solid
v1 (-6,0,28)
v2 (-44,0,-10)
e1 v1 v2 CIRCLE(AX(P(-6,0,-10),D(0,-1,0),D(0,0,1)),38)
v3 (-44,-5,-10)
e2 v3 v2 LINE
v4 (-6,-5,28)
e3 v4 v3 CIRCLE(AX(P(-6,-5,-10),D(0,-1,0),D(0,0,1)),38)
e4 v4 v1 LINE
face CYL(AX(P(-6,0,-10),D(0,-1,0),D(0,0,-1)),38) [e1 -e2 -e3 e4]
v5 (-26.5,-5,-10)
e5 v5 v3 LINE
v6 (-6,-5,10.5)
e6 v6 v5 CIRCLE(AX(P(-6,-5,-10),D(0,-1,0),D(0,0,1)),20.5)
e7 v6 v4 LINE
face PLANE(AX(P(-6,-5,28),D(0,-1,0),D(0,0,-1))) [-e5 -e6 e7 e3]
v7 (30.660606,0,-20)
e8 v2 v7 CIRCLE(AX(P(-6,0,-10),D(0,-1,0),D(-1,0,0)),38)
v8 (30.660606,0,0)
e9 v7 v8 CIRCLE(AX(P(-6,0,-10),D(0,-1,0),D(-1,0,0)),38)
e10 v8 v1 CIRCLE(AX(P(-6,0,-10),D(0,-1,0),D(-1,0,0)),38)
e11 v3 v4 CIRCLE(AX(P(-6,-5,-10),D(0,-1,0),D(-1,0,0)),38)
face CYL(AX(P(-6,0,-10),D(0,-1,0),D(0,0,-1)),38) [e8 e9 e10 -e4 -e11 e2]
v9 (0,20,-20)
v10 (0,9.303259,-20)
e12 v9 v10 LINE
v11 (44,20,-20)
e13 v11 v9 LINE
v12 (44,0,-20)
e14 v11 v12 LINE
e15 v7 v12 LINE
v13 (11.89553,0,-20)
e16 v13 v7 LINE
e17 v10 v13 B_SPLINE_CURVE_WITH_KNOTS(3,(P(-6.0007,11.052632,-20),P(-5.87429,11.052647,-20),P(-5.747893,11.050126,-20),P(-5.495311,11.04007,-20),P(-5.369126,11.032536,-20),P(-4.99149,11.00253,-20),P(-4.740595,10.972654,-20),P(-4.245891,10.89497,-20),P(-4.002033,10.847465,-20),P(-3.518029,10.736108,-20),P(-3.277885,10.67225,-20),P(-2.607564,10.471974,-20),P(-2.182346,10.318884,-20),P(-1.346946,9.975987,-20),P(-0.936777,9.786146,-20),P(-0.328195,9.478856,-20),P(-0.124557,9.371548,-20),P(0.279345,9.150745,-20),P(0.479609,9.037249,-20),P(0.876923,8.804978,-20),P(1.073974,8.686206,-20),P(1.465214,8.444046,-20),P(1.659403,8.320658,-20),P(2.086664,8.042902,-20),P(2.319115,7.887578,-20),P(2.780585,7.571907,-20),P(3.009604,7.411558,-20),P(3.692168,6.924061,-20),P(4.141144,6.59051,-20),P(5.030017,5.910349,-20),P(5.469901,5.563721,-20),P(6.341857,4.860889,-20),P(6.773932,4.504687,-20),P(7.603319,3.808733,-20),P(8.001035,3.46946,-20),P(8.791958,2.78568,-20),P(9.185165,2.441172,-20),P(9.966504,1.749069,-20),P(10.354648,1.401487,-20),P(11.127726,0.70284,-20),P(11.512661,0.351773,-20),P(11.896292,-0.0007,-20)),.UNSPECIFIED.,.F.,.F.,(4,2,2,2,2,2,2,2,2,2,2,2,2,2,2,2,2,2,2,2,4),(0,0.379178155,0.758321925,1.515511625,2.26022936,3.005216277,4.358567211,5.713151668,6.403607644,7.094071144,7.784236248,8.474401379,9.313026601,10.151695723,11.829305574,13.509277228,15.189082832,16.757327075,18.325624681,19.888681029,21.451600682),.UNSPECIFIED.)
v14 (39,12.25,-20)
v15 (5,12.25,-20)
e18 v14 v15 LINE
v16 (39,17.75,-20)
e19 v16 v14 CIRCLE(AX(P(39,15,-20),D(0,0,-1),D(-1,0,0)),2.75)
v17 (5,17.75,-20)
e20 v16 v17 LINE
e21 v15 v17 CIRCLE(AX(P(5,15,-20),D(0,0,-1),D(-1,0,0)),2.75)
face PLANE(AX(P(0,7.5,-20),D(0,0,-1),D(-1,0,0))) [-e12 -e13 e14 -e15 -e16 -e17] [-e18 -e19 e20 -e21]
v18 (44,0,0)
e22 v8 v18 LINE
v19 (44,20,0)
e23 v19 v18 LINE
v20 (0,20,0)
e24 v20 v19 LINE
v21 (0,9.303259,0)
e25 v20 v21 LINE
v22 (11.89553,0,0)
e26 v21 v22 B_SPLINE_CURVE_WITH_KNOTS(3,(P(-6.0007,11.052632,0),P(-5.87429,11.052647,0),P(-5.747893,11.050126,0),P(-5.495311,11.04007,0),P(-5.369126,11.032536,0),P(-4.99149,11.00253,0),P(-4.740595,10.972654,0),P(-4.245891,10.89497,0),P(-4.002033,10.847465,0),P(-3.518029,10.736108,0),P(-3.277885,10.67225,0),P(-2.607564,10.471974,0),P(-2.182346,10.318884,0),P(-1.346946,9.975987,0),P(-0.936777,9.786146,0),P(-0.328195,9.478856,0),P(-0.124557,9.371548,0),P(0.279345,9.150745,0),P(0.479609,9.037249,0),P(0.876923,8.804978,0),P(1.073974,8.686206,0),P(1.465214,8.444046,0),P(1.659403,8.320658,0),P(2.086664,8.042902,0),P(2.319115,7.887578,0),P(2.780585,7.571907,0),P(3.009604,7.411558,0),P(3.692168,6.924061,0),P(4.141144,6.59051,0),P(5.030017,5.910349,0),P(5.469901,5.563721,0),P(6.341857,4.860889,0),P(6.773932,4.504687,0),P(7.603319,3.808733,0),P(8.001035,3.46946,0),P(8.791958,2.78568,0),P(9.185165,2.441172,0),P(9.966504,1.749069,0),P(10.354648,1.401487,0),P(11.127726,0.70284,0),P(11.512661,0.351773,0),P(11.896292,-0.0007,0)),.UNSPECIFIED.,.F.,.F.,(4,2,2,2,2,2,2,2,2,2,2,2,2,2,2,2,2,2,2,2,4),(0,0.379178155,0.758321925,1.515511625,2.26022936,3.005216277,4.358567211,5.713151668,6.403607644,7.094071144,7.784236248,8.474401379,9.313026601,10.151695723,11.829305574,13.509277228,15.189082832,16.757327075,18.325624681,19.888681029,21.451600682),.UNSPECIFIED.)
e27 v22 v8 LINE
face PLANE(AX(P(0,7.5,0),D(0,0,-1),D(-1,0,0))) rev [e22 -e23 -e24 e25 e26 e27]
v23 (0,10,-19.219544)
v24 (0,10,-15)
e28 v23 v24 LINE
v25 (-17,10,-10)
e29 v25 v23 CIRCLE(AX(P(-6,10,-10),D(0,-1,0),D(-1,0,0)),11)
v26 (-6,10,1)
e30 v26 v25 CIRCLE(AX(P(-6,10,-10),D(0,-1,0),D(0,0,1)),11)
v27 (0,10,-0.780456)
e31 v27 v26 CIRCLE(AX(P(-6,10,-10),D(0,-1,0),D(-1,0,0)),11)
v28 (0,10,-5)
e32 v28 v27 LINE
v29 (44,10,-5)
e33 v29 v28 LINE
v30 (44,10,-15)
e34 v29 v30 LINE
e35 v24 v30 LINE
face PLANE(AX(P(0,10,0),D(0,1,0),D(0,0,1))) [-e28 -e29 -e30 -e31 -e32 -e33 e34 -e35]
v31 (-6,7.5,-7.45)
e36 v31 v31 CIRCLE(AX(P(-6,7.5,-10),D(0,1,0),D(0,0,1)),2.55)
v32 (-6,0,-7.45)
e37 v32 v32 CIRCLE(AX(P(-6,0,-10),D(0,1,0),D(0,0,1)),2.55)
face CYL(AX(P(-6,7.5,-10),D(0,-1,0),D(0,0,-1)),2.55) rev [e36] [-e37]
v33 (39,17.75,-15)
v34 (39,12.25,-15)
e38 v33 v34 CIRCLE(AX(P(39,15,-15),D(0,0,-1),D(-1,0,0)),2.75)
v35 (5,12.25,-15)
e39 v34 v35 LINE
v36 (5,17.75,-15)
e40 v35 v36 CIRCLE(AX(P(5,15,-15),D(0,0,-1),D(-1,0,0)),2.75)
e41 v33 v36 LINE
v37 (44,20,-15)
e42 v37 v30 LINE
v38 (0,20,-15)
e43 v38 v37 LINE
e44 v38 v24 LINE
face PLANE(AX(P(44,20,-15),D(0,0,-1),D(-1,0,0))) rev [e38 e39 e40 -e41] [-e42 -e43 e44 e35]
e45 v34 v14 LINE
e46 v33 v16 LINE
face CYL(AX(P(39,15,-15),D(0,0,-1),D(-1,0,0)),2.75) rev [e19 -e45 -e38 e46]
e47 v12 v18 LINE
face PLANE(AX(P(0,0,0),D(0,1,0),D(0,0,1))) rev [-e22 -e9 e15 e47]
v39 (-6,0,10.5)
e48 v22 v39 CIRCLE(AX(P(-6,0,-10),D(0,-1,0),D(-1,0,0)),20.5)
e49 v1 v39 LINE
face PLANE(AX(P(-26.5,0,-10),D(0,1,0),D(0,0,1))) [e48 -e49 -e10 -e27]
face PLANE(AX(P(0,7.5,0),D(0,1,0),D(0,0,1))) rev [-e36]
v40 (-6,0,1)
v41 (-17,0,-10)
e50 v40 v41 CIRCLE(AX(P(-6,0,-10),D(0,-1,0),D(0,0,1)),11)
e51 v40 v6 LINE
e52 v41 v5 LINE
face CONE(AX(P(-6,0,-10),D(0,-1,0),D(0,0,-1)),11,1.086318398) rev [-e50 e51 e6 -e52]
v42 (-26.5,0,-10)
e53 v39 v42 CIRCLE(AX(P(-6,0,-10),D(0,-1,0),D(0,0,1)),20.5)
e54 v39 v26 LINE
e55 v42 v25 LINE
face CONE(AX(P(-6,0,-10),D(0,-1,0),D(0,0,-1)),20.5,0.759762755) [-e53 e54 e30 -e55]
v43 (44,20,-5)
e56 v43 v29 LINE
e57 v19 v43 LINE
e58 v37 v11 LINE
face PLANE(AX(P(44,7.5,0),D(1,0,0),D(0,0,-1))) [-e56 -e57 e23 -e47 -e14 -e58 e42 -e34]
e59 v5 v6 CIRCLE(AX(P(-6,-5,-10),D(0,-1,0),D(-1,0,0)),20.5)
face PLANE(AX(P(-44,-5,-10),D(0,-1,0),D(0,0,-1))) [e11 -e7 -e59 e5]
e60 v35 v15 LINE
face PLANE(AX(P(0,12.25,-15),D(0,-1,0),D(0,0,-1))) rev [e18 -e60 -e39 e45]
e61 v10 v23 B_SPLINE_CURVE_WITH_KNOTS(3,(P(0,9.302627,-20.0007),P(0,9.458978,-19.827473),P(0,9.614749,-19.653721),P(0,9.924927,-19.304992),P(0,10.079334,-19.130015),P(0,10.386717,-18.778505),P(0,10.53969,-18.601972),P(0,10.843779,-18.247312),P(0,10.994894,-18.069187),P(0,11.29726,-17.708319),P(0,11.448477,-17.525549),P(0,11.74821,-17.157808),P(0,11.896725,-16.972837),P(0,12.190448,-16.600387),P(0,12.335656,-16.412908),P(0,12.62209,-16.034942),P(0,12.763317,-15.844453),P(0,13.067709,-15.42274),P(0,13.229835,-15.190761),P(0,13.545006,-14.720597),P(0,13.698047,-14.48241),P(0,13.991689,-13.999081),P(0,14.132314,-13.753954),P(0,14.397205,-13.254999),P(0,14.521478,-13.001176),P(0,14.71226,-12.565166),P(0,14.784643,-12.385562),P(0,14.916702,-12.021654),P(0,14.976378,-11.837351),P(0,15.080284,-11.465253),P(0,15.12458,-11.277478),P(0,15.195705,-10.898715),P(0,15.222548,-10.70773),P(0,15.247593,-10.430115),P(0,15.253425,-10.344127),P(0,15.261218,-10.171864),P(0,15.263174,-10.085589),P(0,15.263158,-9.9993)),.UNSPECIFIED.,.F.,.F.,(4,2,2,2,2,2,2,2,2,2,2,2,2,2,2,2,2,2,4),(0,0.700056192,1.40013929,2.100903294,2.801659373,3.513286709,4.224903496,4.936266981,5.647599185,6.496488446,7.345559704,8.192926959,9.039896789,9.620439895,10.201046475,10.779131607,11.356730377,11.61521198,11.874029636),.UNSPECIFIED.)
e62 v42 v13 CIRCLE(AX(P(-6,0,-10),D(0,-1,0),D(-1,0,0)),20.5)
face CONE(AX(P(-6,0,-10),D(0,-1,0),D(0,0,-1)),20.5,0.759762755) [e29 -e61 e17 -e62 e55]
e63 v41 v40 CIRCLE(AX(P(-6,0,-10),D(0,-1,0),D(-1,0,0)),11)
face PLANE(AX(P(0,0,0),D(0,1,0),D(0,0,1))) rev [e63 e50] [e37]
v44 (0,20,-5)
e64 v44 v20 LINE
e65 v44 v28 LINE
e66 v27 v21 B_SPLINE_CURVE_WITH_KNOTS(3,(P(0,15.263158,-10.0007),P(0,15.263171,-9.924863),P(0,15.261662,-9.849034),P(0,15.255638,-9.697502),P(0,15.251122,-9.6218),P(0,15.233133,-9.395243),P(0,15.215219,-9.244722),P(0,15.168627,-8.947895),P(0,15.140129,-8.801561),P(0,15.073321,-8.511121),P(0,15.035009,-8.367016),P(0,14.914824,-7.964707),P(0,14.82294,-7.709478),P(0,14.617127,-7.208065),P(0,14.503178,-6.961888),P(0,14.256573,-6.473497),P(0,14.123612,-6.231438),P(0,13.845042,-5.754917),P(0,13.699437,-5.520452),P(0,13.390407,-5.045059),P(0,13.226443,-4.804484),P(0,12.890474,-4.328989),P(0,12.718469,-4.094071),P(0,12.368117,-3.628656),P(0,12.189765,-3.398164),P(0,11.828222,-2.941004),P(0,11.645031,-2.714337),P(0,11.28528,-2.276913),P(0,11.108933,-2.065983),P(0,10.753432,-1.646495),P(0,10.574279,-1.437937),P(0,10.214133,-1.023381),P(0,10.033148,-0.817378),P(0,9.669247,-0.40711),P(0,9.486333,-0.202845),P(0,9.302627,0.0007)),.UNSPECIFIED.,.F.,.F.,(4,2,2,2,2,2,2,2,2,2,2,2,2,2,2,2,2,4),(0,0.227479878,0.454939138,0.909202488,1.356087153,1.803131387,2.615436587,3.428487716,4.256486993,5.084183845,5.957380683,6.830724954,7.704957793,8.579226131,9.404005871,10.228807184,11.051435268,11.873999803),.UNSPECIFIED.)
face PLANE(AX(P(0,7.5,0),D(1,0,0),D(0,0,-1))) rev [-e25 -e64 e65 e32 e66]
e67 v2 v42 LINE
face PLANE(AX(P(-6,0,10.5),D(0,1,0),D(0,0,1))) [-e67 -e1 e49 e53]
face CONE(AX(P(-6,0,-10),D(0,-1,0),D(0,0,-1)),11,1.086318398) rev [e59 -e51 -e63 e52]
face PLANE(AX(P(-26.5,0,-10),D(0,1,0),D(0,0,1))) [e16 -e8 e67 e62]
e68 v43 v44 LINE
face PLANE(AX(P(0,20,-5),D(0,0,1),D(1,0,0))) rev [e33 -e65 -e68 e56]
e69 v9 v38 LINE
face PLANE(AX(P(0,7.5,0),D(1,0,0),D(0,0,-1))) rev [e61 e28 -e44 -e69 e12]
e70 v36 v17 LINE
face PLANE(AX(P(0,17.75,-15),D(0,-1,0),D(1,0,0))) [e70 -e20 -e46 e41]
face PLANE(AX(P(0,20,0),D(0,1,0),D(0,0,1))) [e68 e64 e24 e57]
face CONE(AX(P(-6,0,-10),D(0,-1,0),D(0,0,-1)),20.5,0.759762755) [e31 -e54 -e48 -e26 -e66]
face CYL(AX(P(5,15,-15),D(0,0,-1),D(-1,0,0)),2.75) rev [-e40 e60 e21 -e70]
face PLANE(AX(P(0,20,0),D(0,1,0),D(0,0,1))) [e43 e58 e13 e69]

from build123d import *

# Parameters (mm, degrees)
SKETCH1_R               = 2.55
BOSS_EXTRUDE1_DEPTH     = 7.5
BOSS_EXTRUDE2_DEPTH     = 2.5
SKETCH3_W               = 44
SKETCH3_H               = 5
BOSS_EXTRUDE3_DEPTH     = 10
CUT_EXTRUDE1_DEPTH      = 53.306787322
CUT_EXTRUDE1_DEPTH_BACK = 5


with BuildPart() as part:
    # Sketch1 → Boss-Extrude1 (new body)
    with BuildSketch(Plane(origin=(0, 0, 0), x_dir=(1, 0, 0), z_dir=(0, 1, 0))):
        with BuildLine():
            Line((0, 14), (-6, 14))
            ThreePointArc((-6, 14), (-10, 10), (-6, 6))
            Line((-6, 6), (0, 6))
            Line((0, 6), (0, 0))
            Line((0, 0), (44, 0))
            Line((44, 0), (44, 20))
            Line((44, 20), (0, 20))
            Line((0, 20), (0, 14))
        make_face()
        with Locations((-6, 10)):
            Circle(SKETCH1_R, mode=Mode.SUBTRACT)
    extrude(amount=BOSS_EXTRUDE1_DEPTH)

    # Sketch2 → Boss-Extrude2 (add)
    with BuildSketch(Plane(origin=(0, 7.5, 0), x_dir=(1, 0, 0), z_dir=(0, 1, 0))):
        with BuildLine():
            Line((0, 0), (44, 0))
            Line((44, 0), (44, 20))
            Line((44, 20), (0, 20))
            Line((0, 20), (0, 14))
            Line((0, 14), (-6, 14))
            ThreePointArc((-6, 14), (-10, 10), (-6, 6))
            Line((-6, 6), (0, 6))
            Line((0, 6), (0, 0))
        make_face()
    extrude(amount=BOSS_EXTRUDE2_DEPTH)

    # Sketch3 → Boss-Extrude3 (add)
    with BuildSketch(Plane(origin=(0, 10, 0), x_dir=(1, 0, 0), z_dir=(0, 1, 0))):
        with Locations((22, 2.5)):
            Rectangle(SKETCH3_W, SKETCH3_H)
        with Locations((22, 17.5)):
            Rectangle(SKETCH3_W, SKETCH3_H)
    extrude(amount=BOSS_EXTRUDE3_DEPTH)

    # Sketch4 → Cut-Extrude1 (cut, two sides: drawn at the far end of the back side and taken through both)
    with BuildSketch(Plane(origin=(0, 0, -20), x_dir=(-1, 0, 0), z_dir=(0, 0, -1)).offset(-CUT_EXTRUDE1_DEPTH_BACK)):
        with BuildLine():
            Line((-5, 17.75), (-39, 17.75))
            ThreePointArc((-39, 17.75), (-41.75, 15), (-39, 12.25))
            Line((-39, 12.25), (-5, 12.25))
            ThreePointArc((-5, 12.25), (-2.25, 15), (-5, 17.75))
        make_face()
    extrude(amount=CUT_EXTRUDE1_DEPTH + CUT_EXTRUDE1_DEPTH_BACK, mode=Mode.SUBTRACT)

    # Sweep1: sweep along a curve in space
    with BuildLine() as sweep1_path:
        ThreePointArc((-6, 0, -7.45), (-4.196877708, 0, -8.196877708), (-3.45, 0, -10))
        ThreePointArc((-3.45, 0, -10), (-4.196877708, 0, -11.803122292), (-6, 0, -12.55))
        ThreePointArc((-6, 0, -12.55), (-7.803122292, 0, -11.803122292), (-8.55, 0, -10))
        ThreePointArc((-8.55, 0, -10), (-7.803122292, 0, -8.196877708), (-6, 0, -7.45))
    # 3DSketch1 → Sweep1 (sweep)
    with BuildSketch(Plane(origin=(-8.55, 0, -10), x_dir=(-0.9901993201277149, -0.13966139917175113, 0), z_dir=(0, 0, -1))):
        Polygon((0, 0), (-1.396613992, 9.901993201), (6.970570263, 11.082132024), (17.774077796, 2.506922115), (35.102565899, 4.950996601), (35.800872894, 0), (18.472384792, -2.444074486), (8.367184255, 1.180138823), align=None)
    sweep(path=sweep1_path.line)


solid = part.part
